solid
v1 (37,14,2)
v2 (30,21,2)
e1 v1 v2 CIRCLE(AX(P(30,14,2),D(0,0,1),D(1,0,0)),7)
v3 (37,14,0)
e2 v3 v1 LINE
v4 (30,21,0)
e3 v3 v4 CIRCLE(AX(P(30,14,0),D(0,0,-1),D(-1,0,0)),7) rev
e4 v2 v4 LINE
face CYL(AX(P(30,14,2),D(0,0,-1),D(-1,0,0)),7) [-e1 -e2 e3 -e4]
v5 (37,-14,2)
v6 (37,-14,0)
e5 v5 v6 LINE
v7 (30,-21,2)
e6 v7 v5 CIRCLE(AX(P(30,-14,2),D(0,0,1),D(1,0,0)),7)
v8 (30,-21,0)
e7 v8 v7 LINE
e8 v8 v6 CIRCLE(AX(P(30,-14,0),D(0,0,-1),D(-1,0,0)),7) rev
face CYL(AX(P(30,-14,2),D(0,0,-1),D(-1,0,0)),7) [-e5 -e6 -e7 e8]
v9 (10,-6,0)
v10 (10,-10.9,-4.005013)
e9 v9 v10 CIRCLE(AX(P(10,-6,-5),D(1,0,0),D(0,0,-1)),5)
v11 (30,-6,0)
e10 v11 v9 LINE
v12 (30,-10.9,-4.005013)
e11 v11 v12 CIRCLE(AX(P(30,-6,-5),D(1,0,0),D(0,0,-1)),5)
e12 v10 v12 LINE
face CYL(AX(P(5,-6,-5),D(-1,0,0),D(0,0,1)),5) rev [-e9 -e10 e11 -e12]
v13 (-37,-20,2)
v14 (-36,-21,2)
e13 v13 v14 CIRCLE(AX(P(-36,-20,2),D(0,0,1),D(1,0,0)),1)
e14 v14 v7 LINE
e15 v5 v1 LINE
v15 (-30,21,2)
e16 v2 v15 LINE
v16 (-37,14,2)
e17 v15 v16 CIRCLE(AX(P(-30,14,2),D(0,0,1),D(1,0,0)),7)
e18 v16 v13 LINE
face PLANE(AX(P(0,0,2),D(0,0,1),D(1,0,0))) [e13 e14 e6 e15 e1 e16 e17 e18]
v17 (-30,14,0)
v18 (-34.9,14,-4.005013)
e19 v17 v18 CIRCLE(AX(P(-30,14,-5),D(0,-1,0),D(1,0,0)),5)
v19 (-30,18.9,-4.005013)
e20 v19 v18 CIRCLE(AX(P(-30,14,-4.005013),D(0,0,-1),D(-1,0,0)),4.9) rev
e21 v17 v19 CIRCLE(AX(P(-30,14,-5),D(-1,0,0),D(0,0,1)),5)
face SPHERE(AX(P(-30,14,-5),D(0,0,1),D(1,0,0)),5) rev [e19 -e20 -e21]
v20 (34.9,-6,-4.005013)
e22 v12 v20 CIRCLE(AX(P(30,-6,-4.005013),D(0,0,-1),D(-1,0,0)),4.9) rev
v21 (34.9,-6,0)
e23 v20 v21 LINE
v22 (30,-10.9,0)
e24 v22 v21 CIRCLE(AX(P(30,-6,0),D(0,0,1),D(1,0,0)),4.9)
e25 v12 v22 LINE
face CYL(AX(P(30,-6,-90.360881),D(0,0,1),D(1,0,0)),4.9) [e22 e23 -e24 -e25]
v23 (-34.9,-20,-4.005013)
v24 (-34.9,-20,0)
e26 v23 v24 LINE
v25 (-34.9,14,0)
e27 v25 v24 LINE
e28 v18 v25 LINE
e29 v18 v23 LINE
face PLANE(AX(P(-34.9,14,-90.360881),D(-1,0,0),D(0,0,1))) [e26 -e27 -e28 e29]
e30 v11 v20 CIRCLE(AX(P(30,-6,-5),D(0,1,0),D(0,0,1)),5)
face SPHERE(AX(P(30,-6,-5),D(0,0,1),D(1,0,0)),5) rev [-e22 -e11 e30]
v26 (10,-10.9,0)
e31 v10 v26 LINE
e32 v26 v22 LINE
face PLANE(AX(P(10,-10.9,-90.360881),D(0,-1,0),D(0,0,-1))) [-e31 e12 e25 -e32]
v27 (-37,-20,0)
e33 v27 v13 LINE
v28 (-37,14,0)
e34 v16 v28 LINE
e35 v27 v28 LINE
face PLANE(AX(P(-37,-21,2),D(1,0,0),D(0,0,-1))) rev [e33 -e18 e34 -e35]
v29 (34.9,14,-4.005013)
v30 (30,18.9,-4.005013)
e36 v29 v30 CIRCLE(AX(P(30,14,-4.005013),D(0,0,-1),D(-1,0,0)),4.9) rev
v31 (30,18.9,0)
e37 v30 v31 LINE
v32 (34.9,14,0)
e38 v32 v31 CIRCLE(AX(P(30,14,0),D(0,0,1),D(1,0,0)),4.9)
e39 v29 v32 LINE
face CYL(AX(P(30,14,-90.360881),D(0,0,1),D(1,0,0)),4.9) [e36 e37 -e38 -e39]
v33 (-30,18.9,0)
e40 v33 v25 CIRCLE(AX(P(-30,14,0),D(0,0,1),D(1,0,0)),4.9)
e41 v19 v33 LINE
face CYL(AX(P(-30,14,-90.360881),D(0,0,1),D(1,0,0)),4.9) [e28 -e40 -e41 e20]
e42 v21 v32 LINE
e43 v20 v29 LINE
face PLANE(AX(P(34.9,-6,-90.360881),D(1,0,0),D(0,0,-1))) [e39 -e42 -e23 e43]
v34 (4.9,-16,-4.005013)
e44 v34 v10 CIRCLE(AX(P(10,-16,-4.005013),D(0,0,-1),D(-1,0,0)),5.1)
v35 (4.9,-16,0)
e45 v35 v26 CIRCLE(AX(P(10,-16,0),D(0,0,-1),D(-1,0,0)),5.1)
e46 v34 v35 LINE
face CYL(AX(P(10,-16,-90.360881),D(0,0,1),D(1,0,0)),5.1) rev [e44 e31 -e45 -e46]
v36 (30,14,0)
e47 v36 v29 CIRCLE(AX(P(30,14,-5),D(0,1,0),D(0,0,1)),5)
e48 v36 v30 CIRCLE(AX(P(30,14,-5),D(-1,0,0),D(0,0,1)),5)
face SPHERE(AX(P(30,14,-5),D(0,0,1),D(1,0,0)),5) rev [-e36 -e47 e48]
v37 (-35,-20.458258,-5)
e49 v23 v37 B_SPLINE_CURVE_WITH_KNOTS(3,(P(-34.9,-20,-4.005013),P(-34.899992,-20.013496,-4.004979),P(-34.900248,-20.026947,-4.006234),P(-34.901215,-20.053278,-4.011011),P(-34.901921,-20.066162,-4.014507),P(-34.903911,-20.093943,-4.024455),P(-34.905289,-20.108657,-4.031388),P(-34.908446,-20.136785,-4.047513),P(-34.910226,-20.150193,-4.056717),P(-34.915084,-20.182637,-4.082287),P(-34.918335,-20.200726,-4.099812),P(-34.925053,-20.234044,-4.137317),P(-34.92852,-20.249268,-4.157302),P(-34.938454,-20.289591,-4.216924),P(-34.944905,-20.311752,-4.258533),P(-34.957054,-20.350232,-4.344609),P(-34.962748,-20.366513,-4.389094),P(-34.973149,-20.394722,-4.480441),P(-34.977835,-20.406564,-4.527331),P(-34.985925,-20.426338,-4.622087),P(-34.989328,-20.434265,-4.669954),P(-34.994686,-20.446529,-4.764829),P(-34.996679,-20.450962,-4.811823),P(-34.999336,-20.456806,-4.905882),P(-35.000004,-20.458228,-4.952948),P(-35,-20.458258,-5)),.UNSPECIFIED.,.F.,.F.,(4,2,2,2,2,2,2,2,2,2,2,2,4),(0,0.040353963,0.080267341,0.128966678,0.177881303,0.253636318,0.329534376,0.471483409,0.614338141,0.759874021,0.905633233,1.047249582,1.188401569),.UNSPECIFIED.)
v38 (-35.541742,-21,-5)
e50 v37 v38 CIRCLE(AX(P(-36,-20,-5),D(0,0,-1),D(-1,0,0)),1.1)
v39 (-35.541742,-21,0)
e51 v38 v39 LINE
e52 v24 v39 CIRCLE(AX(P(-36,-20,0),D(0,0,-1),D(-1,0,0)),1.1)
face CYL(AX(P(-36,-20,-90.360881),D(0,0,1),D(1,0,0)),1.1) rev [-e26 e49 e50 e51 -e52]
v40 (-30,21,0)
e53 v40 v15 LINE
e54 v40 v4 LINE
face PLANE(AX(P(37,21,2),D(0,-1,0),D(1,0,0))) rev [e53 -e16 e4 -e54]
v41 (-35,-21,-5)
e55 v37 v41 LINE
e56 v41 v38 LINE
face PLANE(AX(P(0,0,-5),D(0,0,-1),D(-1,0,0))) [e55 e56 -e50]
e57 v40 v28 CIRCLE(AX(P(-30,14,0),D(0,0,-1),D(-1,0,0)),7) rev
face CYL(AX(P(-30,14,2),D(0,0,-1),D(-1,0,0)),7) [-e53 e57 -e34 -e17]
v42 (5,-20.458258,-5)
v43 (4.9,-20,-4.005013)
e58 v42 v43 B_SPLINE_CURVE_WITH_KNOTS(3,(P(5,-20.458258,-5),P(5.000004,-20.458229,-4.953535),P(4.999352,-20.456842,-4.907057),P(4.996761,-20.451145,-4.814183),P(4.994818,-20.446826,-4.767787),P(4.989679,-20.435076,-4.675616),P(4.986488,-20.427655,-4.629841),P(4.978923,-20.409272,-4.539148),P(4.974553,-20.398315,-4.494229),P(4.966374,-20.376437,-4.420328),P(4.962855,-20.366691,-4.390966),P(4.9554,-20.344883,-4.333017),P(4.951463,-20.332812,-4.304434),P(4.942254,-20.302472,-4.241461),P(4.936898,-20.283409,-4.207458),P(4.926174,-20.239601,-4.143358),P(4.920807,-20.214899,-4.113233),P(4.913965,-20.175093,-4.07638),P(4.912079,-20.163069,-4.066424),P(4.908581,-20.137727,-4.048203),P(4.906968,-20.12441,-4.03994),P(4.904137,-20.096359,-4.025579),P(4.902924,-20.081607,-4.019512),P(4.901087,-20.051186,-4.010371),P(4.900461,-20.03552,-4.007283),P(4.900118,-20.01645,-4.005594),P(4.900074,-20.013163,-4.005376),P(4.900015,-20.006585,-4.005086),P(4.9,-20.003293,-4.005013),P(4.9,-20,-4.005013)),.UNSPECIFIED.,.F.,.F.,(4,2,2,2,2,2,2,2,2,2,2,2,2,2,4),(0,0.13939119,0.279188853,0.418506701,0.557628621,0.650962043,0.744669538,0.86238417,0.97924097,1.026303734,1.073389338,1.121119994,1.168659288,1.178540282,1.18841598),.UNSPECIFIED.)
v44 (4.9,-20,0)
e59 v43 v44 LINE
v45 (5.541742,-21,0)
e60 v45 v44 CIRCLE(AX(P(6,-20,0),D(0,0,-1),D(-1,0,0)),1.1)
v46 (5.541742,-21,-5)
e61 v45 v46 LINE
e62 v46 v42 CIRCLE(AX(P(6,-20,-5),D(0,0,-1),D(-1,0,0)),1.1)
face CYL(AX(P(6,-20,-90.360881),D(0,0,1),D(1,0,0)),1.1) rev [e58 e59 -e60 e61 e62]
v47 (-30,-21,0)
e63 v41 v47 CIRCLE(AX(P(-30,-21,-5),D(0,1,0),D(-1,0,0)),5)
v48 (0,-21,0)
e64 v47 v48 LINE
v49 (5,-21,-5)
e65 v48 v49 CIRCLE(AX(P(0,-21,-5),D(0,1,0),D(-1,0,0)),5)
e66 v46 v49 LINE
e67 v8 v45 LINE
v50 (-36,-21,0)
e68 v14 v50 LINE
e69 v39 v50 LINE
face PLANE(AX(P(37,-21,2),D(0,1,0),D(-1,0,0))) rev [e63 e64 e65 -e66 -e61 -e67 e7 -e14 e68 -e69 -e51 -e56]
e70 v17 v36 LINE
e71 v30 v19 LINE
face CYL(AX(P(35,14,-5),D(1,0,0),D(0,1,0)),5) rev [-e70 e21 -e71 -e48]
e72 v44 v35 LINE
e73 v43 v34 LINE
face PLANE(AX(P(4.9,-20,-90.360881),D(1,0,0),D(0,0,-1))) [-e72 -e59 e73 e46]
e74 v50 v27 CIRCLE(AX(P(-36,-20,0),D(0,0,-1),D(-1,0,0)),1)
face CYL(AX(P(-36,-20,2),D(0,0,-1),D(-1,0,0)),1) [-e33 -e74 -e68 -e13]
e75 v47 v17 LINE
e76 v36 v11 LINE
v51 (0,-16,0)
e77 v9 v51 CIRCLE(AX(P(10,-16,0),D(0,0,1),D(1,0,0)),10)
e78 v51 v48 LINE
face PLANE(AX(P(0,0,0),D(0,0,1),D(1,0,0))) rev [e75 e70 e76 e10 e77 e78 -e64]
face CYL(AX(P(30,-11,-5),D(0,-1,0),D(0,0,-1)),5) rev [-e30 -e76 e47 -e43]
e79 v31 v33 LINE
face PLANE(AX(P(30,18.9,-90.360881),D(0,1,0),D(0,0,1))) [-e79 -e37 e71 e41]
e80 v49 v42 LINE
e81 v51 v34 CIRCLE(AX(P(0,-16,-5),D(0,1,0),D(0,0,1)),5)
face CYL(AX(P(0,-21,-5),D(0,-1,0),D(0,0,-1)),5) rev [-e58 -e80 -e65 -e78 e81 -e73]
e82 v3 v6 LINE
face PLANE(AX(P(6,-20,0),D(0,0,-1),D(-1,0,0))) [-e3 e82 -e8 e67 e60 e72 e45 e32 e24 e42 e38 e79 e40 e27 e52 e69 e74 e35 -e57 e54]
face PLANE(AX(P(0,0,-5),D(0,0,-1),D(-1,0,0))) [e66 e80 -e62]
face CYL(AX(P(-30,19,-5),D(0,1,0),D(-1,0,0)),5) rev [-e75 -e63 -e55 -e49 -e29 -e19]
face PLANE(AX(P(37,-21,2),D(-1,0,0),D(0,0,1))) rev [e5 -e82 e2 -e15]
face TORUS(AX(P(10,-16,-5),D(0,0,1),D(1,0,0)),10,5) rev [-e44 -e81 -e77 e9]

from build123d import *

# Parameters (mm, degrees)
SKETCH1_W           = 74
SKETCH1_H           = 42
BOSS_EXTRUDE1_DEPTH = 2
BOSS_EXTRUDE2_DEPTH = 5
FILLET2_R           = 5
FILLET3_R           = 5
FILLET4_R           = 7
CUT_EXTRUDE2_DEPTH  = 5
FILLET6_R           = 1


with BuildPart() as part:
    # Sketch1 → Boss-Extrude1 (new body)
    with BuildSketch(Plane.XY):
        Rectangle(SKETCH1_W, SKETCH1_H)
    extrude(amount=BOSS_EXTRUDE1_DEPTH)

    # Sketch2 → Boss-Extrude2 (add)
    with BuildSketch(Plane(origin=(0, 0, 0), x_dir=(-1, 0, 0), z_dir=(0, 0, -1))):
        Polygon((37, 21), (-37, 21), (-37, -21), (-5, -21), (-5, -11), (-35, -11), (-35, 19), (35, 19), (35, -21), (37, -21), align=None)
    extrude(amount=BOSS_EXTRUDE2_DEPTH)

    # Fillet2
    fillet2_edges = [part.edges().sort_by_distance(p)[0] for p in [
        (5, -11, -2.5),
        (35, -11, -2.5),
        (35, 19, -2.5),
        (-35, 19, -2.5),
    ]]
    fillet(fillet2_edges, radius=FILLET2_R)

    # Fillet3
    fillet3_edges = [part.edges().sort_by_distance(p)[0] for p in [
        (5, -18.5, 0),
        (6.464466094, -12.464466094, 0),
        (20, -11, 0),
        (33.535533906, -9.535533906, 0),
        (35, 4, 0),
        (33.535533906, 17.535533906, 0),
        (-35, -3.5, 0),
        (-33.535533906, 17.535533906, 0),
        (0, 19, 0),
    ]]
    fillet(fillet3_edges, radius=FILLET3_R - 0.0001)  # a hair under: the kernel refuses the full size

    # Fillet4
    fillet4_edges = [part.edges().sort_by_distance(p)[0] for p in [
        (-37, 21, -1.5),
        (37, 21, -1.5),
        (37, -21, -1.5),
    ]]
    fillet(fillet4_edges, radius=FILLET4_R)

    # Sketch3 → Cut-Extrude2 (cut)
    with BuildSketch(Plane(origin=(0, 0, 0), x_dir=(-1, 0, 0), z_dir=(0, 0, -1))):
        with BuildLine():
            Line((37.1, 21.1), (-37.1, 21.1))
            Line((-37.1, 21.1), (-37.1, -21.1))
            Line((-37.1, -21.1), (-6, -21.1))
            ThreePointArc((-6, -21.1), (-5.222182541, -20.777817459), (-4.9, -20))
            Line((-4.9, -20), (-4.9, -16))
            ThreePointArc((-4.9, -16), (-6.393755416, -12.393755416), (-10, -10.9))
            Line((-10, -10.9), (-30, -10.9))
            ThreePointArc((-30, -10.9), (-33.464823228, -9.464823228), (-34.9, -6))
            Line((-34.9, -6), (-34.9, 14))
            ThreePointArc((-34.9, 14), (-33.464823228, 17.464823228), (-30, 18.9))
            Line((-30, 18.9), (30, 18.9))
            ThreePointArc((30, 18.9), (33.464823228, 17.464823228), (34.9, 14))
            Line((34.9, 14), (34.9, -20))
            ThreePointArc((34.9, -20), (35.222182541, -20.777817459), (36, -21.1))
            Line((36, -21.1), (37.1, -21.1))
            Line((37.1, -21.1), (37.1, 21.1))
        make_face()
    extrude(amount=CUT_EXTRUDE2_DEPTH, mode=Mode.SUBTRACT)

    # Fillet6
    fillet6_edges = [part.edges().sort_by_distance(p)[0] for p in [
        (-37, -21, 1),
    ]]
    fillet(fillet6_edges, radius=FILLET6_R)


solid = part.part
